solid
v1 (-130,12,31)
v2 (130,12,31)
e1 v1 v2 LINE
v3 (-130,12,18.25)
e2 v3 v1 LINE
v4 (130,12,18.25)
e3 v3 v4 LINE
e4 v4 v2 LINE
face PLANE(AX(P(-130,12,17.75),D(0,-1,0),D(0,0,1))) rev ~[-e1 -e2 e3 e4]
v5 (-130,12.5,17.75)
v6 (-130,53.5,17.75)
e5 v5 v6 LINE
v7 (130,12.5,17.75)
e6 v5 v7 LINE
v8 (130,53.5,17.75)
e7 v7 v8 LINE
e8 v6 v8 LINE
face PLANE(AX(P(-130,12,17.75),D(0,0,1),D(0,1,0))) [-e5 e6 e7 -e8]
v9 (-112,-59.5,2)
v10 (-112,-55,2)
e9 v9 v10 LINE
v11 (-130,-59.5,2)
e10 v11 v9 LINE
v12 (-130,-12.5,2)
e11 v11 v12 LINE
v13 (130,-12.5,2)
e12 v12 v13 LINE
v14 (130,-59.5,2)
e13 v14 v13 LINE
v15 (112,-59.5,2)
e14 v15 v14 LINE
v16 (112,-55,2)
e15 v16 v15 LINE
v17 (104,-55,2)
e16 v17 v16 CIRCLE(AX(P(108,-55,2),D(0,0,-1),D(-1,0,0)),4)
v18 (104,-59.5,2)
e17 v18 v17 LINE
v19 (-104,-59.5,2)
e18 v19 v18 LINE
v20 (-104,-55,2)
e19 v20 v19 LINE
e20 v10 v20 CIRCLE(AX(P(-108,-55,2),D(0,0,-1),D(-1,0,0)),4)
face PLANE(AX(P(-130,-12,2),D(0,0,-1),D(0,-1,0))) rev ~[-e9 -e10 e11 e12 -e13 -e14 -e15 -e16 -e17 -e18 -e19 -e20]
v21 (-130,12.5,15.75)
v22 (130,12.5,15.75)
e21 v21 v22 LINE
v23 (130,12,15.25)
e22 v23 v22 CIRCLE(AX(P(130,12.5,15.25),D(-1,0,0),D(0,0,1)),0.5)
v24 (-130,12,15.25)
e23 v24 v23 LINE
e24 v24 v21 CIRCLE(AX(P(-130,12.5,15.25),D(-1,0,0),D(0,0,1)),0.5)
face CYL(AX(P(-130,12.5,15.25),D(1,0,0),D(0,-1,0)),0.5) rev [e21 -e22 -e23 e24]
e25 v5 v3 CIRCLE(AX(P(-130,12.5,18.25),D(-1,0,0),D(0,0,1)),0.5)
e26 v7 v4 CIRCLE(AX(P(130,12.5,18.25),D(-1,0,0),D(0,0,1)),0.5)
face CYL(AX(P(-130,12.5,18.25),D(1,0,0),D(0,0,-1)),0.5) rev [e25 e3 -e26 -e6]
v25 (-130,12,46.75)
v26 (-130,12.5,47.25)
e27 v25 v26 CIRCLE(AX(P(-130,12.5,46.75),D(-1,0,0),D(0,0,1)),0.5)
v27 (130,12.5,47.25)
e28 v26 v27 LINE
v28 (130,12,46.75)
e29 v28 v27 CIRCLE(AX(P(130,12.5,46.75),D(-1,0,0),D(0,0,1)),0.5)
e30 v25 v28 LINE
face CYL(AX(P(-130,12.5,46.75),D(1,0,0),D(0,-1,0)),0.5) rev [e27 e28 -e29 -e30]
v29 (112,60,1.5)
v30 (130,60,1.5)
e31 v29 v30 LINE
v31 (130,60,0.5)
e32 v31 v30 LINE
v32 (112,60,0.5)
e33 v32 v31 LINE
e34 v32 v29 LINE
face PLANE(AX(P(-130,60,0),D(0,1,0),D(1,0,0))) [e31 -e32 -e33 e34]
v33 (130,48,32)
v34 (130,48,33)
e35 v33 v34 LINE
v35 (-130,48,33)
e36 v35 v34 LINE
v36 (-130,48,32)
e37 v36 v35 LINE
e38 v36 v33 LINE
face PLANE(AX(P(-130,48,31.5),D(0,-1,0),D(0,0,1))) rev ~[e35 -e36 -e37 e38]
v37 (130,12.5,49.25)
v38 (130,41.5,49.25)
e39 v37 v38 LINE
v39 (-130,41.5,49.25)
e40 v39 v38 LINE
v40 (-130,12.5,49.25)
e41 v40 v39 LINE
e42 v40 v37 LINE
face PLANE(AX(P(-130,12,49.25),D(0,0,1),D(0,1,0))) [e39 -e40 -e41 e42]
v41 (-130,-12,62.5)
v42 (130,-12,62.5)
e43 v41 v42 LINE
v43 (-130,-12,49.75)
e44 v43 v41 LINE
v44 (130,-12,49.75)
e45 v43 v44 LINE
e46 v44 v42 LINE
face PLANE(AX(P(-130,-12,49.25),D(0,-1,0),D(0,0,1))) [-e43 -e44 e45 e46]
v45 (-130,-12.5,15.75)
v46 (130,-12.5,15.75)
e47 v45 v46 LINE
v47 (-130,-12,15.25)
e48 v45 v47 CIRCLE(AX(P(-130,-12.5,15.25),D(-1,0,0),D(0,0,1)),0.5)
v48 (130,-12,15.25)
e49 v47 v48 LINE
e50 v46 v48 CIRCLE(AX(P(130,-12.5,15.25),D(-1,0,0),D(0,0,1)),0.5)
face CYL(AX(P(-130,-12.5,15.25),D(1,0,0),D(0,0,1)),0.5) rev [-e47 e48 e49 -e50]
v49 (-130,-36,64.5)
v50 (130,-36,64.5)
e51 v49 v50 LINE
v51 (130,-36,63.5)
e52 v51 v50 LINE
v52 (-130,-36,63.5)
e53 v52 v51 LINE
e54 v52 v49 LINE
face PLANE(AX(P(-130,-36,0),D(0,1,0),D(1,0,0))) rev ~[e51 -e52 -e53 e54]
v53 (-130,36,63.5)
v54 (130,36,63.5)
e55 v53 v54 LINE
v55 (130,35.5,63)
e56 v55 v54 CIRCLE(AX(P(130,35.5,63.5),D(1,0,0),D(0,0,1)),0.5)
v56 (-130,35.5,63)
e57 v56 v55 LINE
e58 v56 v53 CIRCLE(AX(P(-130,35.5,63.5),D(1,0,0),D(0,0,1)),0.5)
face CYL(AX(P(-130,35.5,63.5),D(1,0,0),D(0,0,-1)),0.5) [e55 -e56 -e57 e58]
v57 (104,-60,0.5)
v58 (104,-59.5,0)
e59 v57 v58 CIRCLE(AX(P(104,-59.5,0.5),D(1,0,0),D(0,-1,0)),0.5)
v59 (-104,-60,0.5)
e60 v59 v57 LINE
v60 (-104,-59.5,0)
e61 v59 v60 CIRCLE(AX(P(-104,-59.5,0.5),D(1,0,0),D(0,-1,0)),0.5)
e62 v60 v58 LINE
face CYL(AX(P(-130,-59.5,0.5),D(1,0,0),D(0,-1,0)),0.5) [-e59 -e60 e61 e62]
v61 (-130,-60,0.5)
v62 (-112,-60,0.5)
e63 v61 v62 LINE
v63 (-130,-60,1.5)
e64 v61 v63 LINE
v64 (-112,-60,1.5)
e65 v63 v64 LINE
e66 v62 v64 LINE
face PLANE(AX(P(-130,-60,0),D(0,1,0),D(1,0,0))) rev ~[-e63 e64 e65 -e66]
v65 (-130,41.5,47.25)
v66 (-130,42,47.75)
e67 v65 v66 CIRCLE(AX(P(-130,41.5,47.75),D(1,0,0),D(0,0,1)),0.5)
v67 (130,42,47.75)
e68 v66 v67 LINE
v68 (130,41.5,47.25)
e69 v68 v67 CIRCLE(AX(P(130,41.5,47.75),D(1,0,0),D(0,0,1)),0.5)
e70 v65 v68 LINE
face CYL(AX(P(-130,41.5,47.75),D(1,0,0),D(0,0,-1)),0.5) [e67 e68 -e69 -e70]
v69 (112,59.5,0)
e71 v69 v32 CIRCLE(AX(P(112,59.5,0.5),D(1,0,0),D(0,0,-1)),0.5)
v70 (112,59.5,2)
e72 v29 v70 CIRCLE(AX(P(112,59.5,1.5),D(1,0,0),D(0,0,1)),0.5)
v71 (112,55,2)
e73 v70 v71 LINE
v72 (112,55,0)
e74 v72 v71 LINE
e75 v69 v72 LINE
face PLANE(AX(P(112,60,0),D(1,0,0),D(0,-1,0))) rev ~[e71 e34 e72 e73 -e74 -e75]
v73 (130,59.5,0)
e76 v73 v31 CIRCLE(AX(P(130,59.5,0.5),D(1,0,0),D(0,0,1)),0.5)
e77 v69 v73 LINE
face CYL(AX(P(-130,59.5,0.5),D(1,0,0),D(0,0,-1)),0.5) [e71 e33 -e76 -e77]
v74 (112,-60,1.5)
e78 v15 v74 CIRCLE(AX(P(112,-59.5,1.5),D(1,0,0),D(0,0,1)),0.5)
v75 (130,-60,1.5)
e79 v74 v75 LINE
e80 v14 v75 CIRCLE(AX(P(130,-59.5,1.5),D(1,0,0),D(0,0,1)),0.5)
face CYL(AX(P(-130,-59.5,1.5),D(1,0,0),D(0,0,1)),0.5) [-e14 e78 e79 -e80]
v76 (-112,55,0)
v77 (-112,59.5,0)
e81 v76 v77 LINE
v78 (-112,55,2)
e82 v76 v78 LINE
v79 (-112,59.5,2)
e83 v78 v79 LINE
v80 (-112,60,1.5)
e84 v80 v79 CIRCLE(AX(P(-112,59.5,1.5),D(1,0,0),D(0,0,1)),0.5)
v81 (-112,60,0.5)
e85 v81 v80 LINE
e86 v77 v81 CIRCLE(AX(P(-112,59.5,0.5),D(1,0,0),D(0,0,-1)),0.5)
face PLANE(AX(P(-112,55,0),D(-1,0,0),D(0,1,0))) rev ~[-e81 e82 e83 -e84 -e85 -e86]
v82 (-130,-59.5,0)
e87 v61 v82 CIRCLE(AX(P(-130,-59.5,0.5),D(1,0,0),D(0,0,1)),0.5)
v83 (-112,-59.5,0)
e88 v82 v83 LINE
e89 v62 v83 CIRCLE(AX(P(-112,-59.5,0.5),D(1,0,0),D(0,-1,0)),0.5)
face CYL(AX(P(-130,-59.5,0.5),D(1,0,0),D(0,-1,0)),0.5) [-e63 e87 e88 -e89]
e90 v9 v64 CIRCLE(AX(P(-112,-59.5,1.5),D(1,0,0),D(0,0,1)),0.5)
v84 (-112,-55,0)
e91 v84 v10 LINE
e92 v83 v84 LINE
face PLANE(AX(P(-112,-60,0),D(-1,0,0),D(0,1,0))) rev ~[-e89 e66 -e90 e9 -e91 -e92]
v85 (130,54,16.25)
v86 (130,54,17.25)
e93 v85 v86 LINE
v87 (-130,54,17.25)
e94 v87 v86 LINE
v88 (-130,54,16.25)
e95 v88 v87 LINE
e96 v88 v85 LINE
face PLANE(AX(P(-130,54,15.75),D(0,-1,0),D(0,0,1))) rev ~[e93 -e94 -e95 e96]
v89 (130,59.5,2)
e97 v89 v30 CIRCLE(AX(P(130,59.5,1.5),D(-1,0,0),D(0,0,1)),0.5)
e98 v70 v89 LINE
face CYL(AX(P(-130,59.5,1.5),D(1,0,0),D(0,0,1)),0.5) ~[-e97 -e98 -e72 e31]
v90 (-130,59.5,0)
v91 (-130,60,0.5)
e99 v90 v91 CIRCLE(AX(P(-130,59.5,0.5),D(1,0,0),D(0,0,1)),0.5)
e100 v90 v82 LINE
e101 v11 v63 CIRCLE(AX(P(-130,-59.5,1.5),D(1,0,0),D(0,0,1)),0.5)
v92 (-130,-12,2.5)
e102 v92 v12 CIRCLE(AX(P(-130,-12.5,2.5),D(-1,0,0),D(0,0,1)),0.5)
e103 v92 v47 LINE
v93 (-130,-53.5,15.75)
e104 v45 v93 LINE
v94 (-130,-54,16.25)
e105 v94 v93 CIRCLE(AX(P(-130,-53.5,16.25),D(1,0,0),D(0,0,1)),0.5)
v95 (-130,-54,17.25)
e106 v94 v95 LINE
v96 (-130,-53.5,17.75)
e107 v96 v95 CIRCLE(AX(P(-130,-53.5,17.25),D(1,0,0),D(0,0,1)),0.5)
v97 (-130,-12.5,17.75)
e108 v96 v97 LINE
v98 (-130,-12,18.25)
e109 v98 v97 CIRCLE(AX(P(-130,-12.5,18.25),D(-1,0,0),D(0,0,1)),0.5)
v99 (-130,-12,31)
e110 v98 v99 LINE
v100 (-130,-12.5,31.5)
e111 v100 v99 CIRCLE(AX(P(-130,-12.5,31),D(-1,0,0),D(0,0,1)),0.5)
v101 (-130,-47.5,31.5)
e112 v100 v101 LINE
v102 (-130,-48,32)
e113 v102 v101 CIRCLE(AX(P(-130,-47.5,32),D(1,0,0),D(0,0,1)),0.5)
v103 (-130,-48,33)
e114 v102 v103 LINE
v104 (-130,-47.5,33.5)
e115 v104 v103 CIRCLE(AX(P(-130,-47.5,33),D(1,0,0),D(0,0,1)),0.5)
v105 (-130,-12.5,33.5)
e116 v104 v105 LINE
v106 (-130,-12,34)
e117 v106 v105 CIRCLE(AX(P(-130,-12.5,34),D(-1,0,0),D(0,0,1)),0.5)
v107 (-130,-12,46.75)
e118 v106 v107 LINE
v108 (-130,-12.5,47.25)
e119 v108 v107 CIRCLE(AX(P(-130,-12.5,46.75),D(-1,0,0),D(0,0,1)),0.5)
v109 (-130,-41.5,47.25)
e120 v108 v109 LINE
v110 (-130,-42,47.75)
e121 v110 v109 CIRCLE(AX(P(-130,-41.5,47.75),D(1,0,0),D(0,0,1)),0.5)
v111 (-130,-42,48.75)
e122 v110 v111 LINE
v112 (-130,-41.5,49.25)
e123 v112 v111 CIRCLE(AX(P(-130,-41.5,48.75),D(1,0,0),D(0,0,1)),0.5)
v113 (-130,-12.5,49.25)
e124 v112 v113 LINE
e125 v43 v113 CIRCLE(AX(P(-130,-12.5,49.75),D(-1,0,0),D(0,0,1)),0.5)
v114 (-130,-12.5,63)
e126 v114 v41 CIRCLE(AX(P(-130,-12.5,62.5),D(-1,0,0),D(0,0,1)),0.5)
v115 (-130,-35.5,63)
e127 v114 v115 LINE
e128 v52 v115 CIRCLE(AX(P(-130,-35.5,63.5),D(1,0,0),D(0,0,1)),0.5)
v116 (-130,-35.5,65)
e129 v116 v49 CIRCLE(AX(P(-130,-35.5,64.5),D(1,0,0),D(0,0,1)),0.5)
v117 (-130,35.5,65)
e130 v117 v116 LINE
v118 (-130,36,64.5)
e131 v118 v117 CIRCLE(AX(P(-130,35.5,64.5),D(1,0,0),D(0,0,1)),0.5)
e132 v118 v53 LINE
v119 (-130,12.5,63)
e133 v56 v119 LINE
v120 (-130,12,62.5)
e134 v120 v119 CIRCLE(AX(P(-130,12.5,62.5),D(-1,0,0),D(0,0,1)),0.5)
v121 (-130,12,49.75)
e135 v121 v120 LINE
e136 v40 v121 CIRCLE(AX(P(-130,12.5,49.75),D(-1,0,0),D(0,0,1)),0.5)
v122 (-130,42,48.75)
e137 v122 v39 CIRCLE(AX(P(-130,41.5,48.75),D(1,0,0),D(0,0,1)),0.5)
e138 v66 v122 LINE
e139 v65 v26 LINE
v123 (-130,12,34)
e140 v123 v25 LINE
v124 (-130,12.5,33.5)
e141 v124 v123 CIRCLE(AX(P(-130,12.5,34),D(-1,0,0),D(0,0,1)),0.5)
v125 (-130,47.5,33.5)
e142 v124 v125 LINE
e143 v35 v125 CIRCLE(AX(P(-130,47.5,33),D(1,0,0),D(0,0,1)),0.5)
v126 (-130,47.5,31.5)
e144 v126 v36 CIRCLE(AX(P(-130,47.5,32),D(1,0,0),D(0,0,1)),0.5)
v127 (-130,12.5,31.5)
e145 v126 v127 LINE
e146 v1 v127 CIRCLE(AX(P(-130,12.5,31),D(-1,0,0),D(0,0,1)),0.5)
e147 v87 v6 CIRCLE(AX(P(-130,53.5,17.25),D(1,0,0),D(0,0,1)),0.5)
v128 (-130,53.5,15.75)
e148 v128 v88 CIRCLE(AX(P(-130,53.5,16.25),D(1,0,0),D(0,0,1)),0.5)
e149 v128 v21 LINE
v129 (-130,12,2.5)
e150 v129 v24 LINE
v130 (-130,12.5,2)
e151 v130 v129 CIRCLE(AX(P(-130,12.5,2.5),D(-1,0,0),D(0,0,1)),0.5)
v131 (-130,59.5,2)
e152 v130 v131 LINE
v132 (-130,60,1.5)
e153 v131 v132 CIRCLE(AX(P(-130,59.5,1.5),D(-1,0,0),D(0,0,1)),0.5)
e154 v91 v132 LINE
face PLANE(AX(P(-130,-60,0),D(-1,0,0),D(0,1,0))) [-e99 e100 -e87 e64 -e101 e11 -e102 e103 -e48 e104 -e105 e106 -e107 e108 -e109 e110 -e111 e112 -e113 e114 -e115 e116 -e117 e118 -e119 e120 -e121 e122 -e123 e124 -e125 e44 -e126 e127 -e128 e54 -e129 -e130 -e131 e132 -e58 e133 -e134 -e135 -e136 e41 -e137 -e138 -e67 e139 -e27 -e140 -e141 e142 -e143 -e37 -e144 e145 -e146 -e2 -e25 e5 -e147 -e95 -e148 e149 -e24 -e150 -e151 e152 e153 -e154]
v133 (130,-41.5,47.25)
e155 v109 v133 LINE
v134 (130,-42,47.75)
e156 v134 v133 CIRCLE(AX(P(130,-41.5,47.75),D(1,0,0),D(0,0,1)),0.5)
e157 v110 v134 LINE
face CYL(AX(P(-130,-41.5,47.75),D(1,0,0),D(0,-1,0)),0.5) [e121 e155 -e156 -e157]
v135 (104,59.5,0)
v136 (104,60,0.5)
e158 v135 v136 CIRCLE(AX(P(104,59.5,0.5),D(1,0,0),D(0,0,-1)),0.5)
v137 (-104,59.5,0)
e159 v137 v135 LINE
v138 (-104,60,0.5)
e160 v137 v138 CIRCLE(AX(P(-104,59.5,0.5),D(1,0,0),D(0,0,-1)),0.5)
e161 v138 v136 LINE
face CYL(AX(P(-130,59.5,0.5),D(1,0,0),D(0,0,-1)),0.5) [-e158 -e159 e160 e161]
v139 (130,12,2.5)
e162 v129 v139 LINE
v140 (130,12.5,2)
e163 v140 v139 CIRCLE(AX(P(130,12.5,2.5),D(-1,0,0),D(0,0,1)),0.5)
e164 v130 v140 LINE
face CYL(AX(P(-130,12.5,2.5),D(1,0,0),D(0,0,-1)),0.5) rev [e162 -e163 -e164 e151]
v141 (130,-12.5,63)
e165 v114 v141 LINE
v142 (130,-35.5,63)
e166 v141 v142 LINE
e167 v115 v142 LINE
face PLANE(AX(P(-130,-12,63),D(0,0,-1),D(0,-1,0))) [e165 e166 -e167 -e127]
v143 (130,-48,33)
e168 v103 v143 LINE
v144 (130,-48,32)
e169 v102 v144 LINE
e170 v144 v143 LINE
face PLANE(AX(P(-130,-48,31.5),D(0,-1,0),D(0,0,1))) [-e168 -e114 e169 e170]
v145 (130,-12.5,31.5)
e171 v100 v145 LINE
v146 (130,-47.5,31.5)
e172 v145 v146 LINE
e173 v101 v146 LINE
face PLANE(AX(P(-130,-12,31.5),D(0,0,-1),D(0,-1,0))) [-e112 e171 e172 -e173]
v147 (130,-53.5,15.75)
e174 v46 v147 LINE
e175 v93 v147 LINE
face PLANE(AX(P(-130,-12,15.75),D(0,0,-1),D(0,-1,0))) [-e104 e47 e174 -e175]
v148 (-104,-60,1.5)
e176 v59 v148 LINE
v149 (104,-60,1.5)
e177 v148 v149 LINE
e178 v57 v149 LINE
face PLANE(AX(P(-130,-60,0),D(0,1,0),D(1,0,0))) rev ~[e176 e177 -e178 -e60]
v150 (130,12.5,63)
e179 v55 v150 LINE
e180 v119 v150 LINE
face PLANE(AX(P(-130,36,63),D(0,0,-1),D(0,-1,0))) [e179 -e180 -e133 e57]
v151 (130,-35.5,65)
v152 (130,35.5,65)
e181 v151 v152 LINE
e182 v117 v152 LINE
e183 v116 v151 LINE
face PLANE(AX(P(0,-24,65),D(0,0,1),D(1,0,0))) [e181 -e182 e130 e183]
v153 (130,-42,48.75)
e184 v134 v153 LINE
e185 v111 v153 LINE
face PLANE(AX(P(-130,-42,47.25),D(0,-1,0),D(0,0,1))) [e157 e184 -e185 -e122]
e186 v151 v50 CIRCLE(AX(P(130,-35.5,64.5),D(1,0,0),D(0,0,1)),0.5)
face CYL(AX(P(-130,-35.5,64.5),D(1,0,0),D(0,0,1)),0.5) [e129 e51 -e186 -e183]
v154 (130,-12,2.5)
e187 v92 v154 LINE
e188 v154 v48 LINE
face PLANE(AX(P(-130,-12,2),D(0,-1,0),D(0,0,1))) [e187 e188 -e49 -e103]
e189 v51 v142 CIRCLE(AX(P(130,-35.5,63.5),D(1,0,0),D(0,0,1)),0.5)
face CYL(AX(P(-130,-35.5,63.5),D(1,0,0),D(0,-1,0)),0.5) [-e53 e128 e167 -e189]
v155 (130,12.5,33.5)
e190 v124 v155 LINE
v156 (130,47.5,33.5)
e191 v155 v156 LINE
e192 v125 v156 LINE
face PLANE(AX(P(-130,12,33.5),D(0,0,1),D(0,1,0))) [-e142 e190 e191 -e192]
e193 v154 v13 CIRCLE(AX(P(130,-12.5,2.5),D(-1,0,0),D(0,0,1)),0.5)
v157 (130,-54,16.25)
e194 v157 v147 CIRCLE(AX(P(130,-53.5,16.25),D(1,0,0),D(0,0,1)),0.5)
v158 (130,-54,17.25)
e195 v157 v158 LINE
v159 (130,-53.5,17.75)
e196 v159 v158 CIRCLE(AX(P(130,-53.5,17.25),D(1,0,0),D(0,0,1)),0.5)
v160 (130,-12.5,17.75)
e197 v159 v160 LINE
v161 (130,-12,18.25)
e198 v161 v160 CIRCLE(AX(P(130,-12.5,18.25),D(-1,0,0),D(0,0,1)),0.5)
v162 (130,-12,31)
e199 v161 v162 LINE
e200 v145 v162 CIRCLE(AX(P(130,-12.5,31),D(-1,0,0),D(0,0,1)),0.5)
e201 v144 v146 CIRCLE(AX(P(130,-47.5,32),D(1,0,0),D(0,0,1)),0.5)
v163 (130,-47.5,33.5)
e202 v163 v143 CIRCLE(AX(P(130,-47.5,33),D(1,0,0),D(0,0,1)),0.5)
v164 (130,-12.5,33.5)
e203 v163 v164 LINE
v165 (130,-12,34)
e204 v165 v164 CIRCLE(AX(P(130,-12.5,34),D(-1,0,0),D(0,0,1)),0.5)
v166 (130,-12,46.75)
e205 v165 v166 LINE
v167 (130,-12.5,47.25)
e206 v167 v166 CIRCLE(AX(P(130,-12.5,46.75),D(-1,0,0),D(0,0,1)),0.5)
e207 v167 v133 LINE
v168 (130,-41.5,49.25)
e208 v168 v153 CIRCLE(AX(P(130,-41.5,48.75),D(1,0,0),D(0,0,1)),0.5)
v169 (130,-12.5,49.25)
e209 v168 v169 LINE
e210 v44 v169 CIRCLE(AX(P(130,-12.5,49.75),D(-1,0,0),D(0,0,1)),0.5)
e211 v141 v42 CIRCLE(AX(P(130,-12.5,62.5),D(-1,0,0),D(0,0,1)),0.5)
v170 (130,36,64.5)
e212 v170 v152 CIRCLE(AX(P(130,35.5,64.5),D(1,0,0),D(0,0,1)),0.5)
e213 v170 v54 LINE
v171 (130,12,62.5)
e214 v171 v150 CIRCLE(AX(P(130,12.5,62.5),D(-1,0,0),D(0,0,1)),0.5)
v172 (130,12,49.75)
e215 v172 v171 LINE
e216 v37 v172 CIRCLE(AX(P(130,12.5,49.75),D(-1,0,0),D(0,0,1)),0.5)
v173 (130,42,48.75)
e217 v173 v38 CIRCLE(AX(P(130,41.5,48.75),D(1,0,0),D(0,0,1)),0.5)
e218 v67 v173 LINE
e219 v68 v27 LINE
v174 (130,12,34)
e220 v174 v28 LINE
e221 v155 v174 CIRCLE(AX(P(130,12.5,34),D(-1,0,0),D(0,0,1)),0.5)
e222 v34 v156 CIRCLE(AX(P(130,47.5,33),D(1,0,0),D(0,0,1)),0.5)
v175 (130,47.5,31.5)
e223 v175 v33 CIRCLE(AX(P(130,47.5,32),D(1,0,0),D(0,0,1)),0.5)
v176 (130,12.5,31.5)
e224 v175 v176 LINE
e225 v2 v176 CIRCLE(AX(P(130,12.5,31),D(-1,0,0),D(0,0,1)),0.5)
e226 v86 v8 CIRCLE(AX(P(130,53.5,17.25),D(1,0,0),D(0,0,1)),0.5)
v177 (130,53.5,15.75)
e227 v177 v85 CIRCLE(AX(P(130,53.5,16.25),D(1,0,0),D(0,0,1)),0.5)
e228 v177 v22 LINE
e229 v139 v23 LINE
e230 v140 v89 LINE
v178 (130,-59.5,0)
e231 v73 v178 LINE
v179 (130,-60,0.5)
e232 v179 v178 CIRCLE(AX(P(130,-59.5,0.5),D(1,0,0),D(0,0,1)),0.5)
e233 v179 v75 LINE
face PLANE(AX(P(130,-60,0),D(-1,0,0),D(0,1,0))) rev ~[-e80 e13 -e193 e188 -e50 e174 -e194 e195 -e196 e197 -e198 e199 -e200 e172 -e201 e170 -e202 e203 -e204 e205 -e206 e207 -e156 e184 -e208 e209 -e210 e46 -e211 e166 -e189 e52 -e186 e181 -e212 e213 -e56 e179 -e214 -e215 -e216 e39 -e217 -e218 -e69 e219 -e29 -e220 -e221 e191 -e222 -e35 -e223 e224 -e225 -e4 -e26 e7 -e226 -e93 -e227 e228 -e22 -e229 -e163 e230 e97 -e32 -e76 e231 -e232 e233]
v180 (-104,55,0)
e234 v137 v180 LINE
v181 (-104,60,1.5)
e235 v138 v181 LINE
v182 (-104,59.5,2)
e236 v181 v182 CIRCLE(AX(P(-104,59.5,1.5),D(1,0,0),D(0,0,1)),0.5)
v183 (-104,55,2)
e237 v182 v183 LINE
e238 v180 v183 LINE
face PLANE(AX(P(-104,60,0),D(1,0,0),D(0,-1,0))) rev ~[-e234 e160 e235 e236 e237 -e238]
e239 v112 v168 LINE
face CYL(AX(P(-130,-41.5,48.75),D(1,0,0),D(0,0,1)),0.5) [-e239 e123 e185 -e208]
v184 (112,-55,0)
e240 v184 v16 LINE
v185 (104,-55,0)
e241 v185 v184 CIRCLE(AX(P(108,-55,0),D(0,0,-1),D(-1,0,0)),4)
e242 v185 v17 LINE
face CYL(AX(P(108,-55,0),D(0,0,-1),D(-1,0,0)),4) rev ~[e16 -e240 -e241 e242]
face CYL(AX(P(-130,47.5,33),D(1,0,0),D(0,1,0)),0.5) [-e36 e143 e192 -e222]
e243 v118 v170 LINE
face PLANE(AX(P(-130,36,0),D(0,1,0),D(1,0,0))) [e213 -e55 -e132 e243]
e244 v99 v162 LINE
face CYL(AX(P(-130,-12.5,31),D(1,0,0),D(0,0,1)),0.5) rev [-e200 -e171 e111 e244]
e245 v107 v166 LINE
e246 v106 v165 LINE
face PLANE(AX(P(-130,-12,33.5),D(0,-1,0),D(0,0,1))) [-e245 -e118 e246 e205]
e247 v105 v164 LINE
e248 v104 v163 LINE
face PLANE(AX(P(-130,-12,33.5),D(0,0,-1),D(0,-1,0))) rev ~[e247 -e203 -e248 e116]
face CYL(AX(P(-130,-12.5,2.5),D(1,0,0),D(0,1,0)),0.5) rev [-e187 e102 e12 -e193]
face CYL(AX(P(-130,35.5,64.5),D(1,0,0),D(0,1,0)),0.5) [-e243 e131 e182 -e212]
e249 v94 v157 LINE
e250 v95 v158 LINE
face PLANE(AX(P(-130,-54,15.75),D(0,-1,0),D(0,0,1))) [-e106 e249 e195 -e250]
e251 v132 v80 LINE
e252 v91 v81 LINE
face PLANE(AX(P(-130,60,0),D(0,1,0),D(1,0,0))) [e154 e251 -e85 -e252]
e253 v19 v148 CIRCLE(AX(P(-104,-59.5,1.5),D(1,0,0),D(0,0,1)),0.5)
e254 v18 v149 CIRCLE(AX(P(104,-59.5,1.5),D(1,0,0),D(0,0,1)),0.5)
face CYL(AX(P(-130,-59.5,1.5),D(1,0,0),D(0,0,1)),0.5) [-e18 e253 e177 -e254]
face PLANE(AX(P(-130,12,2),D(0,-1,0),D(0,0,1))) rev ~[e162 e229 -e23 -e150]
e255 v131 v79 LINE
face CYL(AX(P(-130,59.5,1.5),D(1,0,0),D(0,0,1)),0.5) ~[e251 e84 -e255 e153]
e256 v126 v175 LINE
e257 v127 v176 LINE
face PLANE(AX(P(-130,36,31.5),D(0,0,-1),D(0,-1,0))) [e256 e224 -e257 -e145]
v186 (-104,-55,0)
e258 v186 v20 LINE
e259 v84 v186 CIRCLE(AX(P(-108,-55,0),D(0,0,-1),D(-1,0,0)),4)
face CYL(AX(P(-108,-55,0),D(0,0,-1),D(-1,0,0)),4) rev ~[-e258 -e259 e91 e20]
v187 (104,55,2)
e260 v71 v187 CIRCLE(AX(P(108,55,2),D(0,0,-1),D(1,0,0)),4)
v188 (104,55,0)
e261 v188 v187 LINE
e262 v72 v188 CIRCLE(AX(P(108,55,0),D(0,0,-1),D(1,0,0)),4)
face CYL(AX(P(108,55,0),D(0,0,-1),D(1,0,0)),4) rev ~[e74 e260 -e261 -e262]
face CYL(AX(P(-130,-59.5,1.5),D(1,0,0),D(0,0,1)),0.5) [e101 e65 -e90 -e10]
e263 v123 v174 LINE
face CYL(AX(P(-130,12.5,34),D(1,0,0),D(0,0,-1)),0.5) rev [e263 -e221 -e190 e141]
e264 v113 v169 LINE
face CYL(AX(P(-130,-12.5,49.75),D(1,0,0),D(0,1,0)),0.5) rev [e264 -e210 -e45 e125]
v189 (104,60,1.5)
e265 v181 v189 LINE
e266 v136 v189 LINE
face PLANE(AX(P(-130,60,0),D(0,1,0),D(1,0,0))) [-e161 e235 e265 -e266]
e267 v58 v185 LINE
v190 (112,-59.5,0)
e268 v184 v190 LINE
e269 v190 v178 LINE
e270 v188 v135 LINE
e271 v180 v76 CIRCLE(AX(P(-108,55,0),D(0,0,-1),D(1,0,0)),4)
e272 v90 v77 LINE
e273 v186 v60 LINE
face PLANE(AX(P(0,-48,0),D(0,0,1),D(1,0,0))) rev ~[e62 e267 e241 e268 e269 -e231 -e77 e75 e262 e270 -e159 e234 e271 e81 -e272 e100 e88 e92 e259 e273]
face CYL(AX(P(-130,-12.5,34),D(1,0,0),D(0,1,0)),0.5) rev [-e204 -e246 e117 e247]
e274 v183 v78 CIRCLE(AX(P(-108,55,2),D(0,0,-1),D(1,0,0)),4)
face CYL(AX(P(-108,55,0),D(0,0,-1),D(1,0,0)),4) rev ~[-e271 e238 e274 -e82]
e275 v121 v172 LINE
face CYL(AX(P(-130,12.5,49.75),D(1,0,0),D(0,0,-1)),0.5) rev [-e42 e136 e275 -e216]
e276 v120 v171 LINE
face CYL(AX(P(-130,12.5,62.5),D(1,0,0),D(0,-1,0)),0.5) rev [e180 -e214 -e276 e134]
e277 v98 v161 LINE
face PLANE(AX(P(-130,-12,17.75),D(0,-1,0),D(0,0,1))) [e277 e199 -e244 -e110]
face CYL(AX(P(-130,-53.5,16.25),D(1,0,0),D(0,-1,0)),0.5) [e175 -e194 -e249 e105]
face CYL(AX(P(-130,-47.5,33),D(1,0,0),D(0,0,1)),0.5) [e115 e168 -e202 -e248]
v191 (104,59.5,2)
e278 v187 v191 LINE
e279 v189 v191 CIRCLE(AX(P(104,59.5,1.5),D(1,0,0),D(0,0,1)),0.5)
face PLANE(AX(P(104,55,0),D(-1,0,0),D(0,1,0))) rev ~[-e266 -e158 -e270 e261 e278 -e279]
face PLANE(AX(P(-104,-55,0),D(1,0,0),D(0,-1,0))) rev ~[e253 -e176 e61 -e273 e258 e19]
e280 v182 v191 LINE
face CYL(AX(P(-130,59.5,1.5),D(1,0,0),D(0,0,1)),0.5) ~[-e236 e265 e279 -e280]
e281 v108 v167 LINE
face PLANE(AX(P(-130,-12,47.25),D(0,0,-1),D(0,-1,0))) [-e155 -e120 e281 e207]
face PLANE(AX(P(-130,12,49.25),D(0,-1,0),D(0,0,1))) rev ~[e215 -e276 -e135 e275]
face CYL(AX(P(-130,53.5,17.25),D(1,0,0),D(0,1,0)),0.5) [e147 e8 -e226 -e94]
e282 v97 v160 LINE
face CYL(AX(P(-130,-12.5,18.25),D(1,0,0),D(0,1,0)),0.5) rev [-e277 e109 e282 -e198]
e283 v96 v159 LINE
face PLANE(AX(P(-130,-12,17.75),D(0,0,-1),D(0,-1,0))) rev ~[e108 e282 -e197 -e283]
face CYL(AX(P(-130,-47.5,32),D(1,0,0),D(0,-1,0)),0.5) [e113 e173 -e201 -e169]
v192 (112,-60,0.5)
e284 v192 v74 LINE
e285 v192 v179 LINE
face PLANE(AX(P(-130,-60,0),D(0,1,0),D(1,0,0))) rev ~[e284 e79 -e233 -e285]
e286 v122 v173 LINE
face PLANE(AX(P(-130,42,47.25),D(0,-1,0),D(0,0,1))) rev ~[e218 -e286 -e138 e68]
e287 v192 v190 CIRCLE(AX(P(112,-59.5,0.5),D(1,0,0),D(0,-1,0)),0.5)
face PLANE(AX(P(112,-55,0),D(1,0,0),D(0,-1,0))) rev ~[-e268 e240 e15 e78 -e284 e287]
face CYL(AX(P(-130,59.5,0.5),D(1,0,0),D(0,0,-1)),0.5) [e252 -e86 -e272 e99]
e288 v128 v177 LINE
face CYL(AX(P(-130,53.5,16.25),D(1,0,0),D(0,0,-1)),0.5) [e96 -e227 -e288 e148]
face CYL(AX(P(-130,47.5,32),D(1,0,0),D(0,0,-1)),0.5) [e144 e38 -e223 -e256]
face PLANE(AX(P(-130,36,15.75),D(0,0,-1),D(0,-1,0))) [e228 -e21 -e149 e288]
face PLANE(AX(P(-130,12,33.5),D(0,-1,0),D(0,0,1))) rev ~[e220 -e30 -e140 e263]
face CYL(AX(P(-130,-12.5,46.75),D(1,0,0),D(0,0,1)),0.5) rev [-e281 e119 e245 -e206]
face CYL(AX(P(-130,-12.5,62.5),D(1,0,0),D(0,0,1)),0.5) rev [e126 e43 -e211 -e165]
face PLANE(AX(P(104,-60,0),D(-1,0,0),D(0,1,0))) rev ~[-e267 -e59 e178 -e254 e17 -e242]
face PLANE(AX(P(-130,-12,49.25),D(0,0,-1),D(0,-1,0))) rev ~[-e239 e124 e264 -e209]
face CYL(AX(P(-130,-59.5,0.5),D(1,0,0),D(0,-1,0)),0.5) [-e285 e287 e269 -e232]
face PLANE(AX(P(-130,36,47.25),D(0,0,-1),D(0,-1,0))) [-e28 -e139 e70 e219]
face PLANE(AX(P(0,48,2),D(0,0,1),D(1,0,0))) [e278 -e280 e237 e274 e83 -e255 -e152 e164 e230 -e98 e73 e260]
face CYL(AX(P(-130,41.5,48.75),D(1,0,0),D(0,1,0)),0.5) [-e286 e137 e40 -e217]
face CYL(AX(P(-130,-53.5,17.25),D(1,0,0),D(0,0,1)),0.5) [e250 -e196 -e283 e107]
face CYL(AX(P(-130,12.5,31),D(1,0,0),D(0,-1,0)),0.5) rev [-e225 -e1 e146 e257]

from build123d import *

# Parameters (mm, degrees)
F0_W     = 260
F0_H     = 24
F1_DEPTH = 65
F2_DEPTH = 2
F3_W     = 12
F3_H     = 2
F3_W_2   = 6
F3_W_3   = 18
F4_DEPTH = 260
F3_W_4   = 24
F3_H_2   = 13.75
F5_DEPTH = 260
F6_R     = 0.5
F7_W     = 8
F7_H     = 0.5
F7_H_2   = 4.5
F8_DEPTH = 2


# Not quite as in the source:
# - a feature names something its author has since deleted; it is built from what else it names


with BuildPart() as f1:
    # F0 (on Top) → F1 (new body)
    with BuildSketch(Plane.XY):
        with Locations((0, -24)):
            Rectangle(F0_W, F0_H)
        Rectangle(F0_W, F0_H)
        with Locations((0, 24)):
            Rectangle(F0_W, F0_H)
    extrude(amount=F1_DEPTH)

    # F0 (on Top) → F2 (join)
    with BuildSketch(Plane.XY):
        with Locations((0, -48)):
            Rectangle(F0_W, F0_H)
        with Locations((0, 48)):
            Rectangle(F0_W, F0_H)
    extrude(amount=F2_DEPTH)

    # F3 (on face) → F4 (join)
    with BuildSketch(Plane(origin=(-130, 0, 0), x_dir=(0, -1, 0), z_dir=(-1, 0, 0))):
        Polygon((36, 65), (0, 65), (0, 0), (60, 0), (60, 2), (36, 2), (12, 2), (12, 15.75), (36, 15.75), (36, 17.75), (12, 17.75), (12, 31.5), (36, 31.5), (36, 33.5), (12, 33.5), (12, 47.25), (36, 47.25), (36, 49.25), (12, 49.25), (12, 63), (36, 63), align=None)
        Polygon((0, 65), (-36, 65), (-36, 63), (-12, 63), (-12, 49.25), (-36, 49.25), (-36, 47.25), (-12, 47.25), (-12, 33.5), (-36, 33.5), (-36, 31.5), (-12, 31.5), (-12, 17.75), (-36, 17.75), (-36, 15.75), (-12, 15.75), (-12, 2), (-36, 2), (-60, 2), (-60, 0), (0, 0), align=None)
        with Locations((-42, 32.5)):
            Rectangle(F3_W, F3_H)
        with Locations((-39, 48.25)):
            Rectangle(F3_W_2, F3_H)
        with Locations((-45, 16.75)):
            Rectangle(F3_W_3, F3_H)
        with Locations((45, 16.75)):
            Rectangle(F3_W_3, F3_H)
        with Locations((42, 32.5)):
            Rectangle(F3_W, F3_H)
        with Locations((39, 48.25)):
            Rectangle(F3_W_2, F3_H)
    extrude(amount=-F4_DEPTH)

    # F3 (on face) → F5 (cut)
    with BuildSketch(Plane(origin=(-130, 0, 0), x_dir=(0, -1, 0), z_dir=(-1, 0, 0))):
        with Locations((-24, 8.875)):
            Rectangle(F3_W_4, F3_H_2)
        with Locations((-24, 56.125)):
            Rectangle(F3_W_4, F3_H_2)
        with Locations((-24, 40.375)):
            Rectangle(F3_W_4, F3_H_2)
        with Locations((-24, 24.625)):
            Rectangle(F3_W_4, F3_H_2)
        with Locations((24, 8.875)):
            Rectangle(F3_W_4, F3_H_2)
        with Locations((24, 24.625)):
            Rectangle(F3_W_4, F3_H_2)
        with Locations((24, 40.375)):
            Rectangle(F3_W_4, F3_H_2)
        with Locations((24, 56.125)):
            Rectangle(F3_W_4, F3_H_2)
    extrude(amount=-F5_DEPTH, mode=Mode.SUBTRACT)

    # F6
    f6_edges = [f1.edges().sort_by_distance(p)[0] for p in [
        (0, 36, 65),
        (0, 36, 63),
        (0, 48, 33.5),
        (0, 48, 31.5),
        (0, 54, 17.75),
        (0, 54, 15.75),
        (0, 60, 0),
        (0, 60, 2),
        (0, -60, 2),
        (0, -54, 17.75),
        (0, -48, 33.5),
        (0, -42, 49.25),
        (0, -36, 65),
        (0, -60, 0),
        (0, -54, 15.75),
        (0, -48, 31.5),
        (0, -42, 47.25),
        (0, -36, 63),
        (0, 12, 63),
        (0, 12, 49.25),
        (0, 12, 33.5),
        (0, 12, 47.25),
        (0, 12, 31.5),
        (0, 12, 15.75),
        (0, 12, 2),
        (0, -12, 63),
        (0, -12, 47.25),
        (0, -12, 31.5),
        (0, -12, 49.25),
        (0, -12, 33.5),
        (0, -12, 15.75),
        (0, -12, 17.75),
        (0, 42, 49.25),
        (0, 12, 17.75),
        (0, -12, 2),
        (0, 42, 47.25),
    ]]
    fillet(f6_edges, radius=F6_R)

    # F7 (on face) → F8 (cut)
    with BuildSketch(Plane(origin=(0, 0, 0), x_dir=(1, 0, 0), z_dir=(0, 0, -1))):
        with Locations((-108, -59.75)):
            Rectangle(F7_W, F7_H)
        with Locations((-108, -57.25)):
            Rectangle(F7_W, F7_H_2)
        with BuildLine():
            ThreePointArc((-104, -55), (-108, -51), (-112, -55))
            Line((-112, -55), (-104, -55))
        make_face()
        with Locations((-108, 59.75)):
            Rectangle(F7_W, F7_H)
        with BuildLine():
            Line((-104, 55), (-112, 55))
            ThreePointArc((-112, 55), (-108, 51), (-104, 55))
        make_face()
        with Locations((108, -59.75)):
            Rectangle(F7_W, F7_H)
        with Locations((108, -57.25)):
            Rectangle(F7_W, F7_H_2)
        with BuildLine():
            ThreePointArc((112, -55), (108, -51), (104, -55))
            Line((104, -55), (112, -55))
        make_face()
        with BuildLine():
            Line((112, 55), (104, 55))
            ThreePointArc((104, 55), (108, 51), (112, 55))
        make_face()
        with Locations((108, 59.75)):
            Rectangle(F7_W, F7_H)
        with Locations((108, 57.25)):
            Rectangle(F7_W, F7_H_2)
        with Locations((-108, 57.25)):
            Rectangle(F7_W, F7_H_2)
    extrude(amount=-F8_DEPTH, mode=Mode.SUBTRACT)


solid = f1.part
